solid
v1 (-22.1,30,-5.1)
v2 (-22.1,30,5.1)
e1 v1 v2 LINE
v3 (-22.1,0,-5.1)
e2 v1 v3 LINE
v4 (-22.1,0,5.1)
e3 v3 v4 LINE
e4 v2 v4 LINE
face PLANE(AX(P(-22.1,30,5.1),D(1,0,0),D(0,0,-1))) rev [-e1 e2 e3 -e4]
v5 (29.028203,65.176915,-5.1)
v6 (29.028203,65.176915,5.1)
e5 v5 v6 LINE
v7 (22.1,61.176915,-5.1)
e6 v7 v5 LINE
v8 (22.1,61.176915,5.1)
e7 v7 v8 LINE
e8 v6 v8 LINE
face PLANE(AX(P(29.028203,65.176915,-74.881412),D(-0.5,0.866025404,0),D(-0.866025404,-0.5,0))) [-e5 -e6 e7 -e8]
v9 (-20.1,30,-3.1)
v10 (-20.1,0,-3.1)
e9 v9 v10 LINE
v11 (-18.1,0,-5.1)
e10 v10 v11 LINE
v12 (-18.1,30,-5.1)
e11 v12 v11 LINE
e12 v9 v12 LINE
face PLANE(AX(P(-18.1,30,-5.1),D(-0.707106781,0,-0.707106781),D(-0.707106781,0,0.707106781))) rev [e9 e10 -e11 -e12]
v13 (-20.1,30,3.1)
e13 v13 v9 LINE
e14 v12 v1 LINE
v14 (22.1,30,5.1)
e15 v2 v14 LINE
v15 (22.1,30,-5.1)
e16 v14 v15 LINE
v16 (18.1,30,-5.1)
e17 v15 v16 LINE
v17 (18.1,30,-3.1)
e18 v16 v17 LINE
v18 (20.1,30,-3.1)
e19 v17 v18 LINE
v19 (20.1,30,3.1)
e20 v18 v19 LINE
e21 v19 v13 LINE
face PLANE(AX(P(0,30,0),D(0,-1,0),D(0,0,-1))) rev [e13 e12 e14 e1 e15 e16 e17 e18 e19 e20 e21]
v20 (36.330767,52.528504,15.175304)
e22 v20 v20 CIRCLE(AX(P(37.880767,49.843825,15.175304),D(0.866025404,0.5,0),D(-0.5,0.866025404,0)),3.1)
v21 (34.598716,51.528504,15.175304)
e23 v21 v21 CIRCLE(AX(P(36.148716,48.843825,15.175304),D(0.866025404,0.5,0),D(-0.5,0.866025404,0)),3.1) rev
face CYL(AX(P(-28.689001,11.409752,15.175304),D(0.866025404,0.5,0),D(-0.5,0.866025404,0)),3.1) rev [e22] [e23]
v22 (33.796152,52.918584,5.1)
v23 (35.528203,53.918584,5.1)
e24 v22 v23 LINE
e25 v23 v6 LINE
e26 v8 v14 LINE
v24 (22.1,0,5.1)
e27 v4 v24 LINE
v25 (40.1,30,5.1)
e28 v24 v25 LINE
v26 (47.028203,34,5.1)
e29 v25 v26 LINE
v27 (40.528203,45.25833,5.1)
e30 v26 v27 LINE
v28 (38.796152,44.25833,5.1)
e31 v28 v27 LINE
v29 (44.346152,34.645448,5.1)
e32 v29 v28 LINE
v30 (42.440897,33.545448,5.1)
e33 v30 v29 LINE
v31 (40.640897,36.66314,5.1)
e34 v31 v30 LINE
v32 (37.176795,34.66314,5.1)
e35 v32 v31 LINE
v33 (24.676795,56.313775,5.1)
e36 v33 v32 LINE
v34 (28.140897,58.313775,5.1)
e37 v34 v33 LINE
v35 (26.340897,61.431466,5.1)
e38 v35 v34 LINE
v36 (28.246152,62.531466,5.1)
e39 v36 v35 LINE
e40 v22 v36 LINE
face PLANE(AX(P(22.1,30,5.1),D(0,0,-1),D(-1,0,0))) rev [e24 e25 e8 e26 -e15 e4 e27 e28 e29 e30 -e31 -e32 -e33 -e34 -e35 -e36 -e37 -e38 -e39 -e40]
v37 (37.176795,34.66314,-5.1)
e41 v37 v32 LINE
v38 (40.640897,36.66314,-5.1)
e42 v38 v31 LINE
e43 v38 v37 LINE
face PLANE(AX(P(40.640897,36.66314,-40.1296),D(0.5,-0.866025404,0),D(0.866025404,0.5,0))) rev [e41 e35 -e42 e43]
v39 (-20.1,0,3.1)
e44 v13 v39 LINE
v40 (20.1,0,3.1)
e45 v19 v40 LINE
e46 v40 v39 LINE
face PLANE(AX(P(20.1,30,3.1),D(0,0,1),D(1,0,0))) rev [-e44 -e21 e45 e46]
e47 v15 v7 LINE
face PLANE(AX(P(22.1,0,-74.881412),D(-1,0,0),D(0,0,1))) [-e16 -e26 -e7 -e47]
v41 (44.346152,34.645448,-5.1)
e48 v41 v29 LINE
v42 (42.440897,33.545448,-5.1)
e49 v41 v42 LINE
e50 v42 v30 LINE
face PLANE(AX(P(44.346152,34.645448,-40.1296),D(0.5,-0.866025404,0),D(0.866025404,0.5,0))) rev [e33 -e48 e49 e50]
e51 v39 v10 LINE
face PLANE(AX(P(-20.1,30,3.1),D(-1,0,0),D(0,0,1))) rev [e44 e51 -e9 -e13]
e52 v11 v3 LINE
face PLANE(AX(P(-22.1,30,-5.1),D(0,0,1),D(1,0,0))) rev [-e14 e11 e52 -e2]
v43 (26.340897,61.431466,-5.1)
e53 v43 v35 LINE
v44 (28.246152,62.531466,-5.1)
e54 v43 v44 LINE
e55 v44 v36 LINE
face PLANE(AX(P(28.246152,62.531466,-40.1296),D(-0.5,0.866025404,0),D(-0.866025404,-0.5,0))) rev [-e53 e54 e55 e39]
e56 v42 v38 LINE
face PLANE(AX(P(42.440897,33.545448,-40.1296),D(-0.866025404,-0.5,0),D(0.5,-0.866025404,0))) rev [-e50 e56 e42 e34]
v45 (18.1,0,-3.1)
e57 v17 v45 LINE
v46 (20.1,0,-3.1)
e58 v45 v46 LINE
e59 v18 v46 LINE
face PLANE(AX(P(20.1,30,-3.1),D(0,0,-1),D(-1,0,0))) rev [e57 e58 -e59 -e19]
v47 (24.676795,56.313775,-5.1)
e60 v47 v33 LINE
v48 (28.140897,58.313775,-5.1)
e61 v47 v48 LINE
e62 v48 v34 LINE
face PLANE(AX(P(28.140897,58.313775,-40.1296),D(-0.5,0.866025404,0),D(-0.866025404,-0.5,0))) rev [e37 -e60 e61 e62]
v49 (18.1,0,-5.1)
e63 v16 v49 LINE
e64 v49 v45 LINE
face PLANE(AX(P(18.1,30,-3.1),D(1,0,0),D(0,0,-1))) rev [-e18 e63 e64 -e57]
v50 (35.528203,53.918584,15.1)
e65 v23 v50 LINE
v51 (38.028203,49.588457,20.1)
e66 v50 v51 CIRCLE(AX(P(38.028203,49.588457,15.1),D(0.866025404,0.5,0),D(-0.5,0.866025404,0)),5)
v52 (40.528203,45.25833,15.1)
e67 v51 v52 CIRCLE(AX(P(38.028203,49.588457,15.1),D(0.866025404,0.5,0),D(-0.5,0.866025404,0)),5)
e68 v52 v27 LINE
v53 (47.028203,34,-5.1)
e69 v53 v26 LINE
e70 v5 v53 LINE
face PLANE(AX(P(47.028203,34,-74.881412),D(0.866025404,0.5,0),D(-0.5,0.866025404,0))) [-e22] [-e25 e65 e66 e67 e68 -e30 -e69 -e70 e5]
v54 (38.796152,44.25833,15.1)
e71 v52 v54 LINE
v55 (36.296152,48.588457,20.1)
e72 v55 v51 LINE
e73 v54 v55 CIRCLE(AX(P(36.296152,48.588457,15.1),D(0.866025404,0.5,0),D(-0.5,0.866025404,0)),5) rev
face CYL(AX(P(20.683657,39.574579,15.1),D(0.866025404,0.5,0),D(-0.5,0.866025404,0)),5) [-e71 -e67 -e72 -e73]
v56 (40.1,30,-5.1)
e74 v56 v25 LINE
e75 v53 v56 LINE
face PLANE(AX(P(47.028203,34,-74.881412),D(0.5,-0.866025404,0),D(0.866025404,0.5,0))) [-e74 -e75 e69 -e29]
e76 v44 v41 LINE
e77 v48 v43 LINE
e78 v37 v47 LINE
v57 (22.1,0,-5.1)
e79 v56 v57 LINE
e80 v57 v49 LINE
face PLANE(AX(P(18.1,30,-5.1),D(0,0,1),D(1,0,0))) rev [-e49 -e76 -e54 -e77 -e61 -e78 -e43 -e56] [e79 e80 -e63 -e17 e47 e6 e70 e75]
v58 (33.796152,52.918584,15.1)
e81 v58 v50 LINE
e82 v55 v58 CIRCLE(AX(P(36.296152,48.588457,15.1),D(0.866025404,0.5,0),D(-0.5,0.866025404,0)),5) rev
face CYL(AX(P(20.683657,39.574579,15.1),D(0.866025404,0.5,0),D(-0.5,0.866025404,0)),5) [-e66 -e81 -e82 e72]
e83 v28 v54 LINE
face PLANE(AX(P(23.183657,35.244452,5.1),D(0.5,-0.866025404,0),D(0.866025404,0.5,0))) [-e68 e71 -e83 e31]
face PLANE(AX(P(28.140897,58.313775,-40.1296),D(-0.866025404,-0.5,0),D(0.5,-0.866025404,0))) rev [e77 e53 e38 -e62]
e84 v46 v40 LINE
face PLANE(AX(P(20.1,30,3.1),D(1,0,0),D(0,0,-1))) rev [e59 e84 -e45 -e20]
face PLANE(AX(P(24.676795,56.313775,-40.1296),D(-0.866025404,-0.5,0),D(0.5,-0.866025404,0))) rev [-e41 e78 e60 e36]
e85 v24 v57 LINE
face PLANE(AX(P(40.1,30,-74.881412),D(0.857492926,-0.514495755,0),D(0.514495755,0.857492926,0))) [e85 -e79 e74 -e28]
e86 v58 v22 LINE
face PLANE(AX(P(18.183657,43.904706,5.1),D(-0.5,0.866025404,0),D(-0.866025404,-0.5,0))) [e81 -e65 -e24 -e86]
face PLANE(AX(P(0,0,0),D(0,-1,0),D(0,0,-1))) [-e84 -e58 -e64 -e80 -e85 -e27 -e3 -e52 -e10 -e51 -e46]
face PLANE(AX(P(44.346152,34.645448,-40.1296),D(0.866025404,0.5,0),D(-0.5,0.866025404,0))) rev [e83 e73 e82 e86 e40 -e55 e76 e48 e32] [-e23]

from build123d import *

# Parameters (mm, degrees)
BOSS_EXTRUDE1_DEPTH = 30
BOSS_EXTRUDE2_DEPTH = 10.2
CUT_EXTRUDE1_DEPTH  = 10.2
SKETCH4_W           = 15
SKETCH4_H           = 10
BOSS_EXTRUDE3_DEPTH = 2
FILLET1_R           = 5
CUT_EXTRUDE2_REACH  = 85.187
SKETCH5_R           = 3.1


with BuildPart() as part:
    # Sketch1 → Boss-Extrude1 (new body)
    with BuildSketch(Plane(origin=(0, 0, 0), x_dir=(1, 0, 0), z_dir=(0, 1, 0))):
        Polygon((18.1, 3.1), (18.1, 5.1), (22.1, 5.1), (22.1, -5.1), (-22.1, -5.1), (-22.1, 5.1), (-18.1, 5.1), (-20.1, 3.1), (-20.1, -3.1), (20.1, -3.1), (20.1, 3.1), align=None)
    extrude(amount=BOSS_EXTRUDE1_DEPTH)

    # Sketch2 → Boss-Extrude2 (add)
    with BuildSketch(Plane.XY.offset(5.1)):
        Polygon((47.02820323, 34), (29.02820323, 65.176914536), (22.1, 61.176914536), (22.1, 30), (22.1, 0), (40.1, 30), align=None)
    extrude(amount=-BOSS_EXTRUDE2_DEPTH)

    # Sketch3 → Cut-Extrude1 (cut)
    with BuildSketch(Plane.XY.offset(5.1)):
        Polygon((44.346152423, 34.645448267), (28.246152423, 62.531466269), (26.340896534, 61.431466269), (28.140896534, 58.313774815), (24.676794919, 56.313774815), (37.176794919, 34.663139721), (40.640896534, 36.663139721), (42.440896534, 33.545448267), align=None)
    extrude(amount=-CUT_EXTRUDE1_DEPTH, mode=Mode.SUBTRACT)

    # Sketch4 → Boss-Extrude3 (add)
    with BuildSketch(Plane(origin=(49.993584287, 28.863809346, 0), x_dir=(0, 0, -1), z_dir=(0.8660254037844421, 0.49999999999999406, 0))):
        with Locations((-12.6, 23.930762114)):
            Rectangle(SKETCH4_W, SKETCH4_H)
    extrude(amount=-BOSS_EXTRUDE3_DEPTH)

    # Fillet1
    fillet1_edges = [part.edges().sort_by_distance(p)[0] for p in [
        (34.662177826, 53.418584287, 20.1),
        (39.662177826, 44.758330249, 20.1),
    ]]
    fillet(fillet1_edges, radius=FILLET1_R - 0.0001)  # a hair under: the kernel refuses the full size

    # Sketch5 → Cut-Extrude2 (cut, up to next)
    with BuildSketch(Plane(origin=(49.993584287, 28.863809346, 0), x_dir=(0, 0, -1), z_dir=(0.8660254037844421, 0.49999999999999406, 0)), mode=Mode.PRIVATE) as cut_extrude2_sk1:
        with Locations(Location((-15.175304154, 24.225635186, 0), (0, 0, 90))):
            Circle(SKETCH5_R)
    cut_extrude2_tool1 = extrude(cut_extrude2_sk1.sketch, amount=-CUT_EXTRUDE2_REACH, mode=Mode.PRIVATE) & part.part
    add(cut_extrude2_tool1.solids().sort_by_distance((37.880767, 49.843825, 15.175304))[0], mode=Mode.SUBTRACT)


solid = part.part
